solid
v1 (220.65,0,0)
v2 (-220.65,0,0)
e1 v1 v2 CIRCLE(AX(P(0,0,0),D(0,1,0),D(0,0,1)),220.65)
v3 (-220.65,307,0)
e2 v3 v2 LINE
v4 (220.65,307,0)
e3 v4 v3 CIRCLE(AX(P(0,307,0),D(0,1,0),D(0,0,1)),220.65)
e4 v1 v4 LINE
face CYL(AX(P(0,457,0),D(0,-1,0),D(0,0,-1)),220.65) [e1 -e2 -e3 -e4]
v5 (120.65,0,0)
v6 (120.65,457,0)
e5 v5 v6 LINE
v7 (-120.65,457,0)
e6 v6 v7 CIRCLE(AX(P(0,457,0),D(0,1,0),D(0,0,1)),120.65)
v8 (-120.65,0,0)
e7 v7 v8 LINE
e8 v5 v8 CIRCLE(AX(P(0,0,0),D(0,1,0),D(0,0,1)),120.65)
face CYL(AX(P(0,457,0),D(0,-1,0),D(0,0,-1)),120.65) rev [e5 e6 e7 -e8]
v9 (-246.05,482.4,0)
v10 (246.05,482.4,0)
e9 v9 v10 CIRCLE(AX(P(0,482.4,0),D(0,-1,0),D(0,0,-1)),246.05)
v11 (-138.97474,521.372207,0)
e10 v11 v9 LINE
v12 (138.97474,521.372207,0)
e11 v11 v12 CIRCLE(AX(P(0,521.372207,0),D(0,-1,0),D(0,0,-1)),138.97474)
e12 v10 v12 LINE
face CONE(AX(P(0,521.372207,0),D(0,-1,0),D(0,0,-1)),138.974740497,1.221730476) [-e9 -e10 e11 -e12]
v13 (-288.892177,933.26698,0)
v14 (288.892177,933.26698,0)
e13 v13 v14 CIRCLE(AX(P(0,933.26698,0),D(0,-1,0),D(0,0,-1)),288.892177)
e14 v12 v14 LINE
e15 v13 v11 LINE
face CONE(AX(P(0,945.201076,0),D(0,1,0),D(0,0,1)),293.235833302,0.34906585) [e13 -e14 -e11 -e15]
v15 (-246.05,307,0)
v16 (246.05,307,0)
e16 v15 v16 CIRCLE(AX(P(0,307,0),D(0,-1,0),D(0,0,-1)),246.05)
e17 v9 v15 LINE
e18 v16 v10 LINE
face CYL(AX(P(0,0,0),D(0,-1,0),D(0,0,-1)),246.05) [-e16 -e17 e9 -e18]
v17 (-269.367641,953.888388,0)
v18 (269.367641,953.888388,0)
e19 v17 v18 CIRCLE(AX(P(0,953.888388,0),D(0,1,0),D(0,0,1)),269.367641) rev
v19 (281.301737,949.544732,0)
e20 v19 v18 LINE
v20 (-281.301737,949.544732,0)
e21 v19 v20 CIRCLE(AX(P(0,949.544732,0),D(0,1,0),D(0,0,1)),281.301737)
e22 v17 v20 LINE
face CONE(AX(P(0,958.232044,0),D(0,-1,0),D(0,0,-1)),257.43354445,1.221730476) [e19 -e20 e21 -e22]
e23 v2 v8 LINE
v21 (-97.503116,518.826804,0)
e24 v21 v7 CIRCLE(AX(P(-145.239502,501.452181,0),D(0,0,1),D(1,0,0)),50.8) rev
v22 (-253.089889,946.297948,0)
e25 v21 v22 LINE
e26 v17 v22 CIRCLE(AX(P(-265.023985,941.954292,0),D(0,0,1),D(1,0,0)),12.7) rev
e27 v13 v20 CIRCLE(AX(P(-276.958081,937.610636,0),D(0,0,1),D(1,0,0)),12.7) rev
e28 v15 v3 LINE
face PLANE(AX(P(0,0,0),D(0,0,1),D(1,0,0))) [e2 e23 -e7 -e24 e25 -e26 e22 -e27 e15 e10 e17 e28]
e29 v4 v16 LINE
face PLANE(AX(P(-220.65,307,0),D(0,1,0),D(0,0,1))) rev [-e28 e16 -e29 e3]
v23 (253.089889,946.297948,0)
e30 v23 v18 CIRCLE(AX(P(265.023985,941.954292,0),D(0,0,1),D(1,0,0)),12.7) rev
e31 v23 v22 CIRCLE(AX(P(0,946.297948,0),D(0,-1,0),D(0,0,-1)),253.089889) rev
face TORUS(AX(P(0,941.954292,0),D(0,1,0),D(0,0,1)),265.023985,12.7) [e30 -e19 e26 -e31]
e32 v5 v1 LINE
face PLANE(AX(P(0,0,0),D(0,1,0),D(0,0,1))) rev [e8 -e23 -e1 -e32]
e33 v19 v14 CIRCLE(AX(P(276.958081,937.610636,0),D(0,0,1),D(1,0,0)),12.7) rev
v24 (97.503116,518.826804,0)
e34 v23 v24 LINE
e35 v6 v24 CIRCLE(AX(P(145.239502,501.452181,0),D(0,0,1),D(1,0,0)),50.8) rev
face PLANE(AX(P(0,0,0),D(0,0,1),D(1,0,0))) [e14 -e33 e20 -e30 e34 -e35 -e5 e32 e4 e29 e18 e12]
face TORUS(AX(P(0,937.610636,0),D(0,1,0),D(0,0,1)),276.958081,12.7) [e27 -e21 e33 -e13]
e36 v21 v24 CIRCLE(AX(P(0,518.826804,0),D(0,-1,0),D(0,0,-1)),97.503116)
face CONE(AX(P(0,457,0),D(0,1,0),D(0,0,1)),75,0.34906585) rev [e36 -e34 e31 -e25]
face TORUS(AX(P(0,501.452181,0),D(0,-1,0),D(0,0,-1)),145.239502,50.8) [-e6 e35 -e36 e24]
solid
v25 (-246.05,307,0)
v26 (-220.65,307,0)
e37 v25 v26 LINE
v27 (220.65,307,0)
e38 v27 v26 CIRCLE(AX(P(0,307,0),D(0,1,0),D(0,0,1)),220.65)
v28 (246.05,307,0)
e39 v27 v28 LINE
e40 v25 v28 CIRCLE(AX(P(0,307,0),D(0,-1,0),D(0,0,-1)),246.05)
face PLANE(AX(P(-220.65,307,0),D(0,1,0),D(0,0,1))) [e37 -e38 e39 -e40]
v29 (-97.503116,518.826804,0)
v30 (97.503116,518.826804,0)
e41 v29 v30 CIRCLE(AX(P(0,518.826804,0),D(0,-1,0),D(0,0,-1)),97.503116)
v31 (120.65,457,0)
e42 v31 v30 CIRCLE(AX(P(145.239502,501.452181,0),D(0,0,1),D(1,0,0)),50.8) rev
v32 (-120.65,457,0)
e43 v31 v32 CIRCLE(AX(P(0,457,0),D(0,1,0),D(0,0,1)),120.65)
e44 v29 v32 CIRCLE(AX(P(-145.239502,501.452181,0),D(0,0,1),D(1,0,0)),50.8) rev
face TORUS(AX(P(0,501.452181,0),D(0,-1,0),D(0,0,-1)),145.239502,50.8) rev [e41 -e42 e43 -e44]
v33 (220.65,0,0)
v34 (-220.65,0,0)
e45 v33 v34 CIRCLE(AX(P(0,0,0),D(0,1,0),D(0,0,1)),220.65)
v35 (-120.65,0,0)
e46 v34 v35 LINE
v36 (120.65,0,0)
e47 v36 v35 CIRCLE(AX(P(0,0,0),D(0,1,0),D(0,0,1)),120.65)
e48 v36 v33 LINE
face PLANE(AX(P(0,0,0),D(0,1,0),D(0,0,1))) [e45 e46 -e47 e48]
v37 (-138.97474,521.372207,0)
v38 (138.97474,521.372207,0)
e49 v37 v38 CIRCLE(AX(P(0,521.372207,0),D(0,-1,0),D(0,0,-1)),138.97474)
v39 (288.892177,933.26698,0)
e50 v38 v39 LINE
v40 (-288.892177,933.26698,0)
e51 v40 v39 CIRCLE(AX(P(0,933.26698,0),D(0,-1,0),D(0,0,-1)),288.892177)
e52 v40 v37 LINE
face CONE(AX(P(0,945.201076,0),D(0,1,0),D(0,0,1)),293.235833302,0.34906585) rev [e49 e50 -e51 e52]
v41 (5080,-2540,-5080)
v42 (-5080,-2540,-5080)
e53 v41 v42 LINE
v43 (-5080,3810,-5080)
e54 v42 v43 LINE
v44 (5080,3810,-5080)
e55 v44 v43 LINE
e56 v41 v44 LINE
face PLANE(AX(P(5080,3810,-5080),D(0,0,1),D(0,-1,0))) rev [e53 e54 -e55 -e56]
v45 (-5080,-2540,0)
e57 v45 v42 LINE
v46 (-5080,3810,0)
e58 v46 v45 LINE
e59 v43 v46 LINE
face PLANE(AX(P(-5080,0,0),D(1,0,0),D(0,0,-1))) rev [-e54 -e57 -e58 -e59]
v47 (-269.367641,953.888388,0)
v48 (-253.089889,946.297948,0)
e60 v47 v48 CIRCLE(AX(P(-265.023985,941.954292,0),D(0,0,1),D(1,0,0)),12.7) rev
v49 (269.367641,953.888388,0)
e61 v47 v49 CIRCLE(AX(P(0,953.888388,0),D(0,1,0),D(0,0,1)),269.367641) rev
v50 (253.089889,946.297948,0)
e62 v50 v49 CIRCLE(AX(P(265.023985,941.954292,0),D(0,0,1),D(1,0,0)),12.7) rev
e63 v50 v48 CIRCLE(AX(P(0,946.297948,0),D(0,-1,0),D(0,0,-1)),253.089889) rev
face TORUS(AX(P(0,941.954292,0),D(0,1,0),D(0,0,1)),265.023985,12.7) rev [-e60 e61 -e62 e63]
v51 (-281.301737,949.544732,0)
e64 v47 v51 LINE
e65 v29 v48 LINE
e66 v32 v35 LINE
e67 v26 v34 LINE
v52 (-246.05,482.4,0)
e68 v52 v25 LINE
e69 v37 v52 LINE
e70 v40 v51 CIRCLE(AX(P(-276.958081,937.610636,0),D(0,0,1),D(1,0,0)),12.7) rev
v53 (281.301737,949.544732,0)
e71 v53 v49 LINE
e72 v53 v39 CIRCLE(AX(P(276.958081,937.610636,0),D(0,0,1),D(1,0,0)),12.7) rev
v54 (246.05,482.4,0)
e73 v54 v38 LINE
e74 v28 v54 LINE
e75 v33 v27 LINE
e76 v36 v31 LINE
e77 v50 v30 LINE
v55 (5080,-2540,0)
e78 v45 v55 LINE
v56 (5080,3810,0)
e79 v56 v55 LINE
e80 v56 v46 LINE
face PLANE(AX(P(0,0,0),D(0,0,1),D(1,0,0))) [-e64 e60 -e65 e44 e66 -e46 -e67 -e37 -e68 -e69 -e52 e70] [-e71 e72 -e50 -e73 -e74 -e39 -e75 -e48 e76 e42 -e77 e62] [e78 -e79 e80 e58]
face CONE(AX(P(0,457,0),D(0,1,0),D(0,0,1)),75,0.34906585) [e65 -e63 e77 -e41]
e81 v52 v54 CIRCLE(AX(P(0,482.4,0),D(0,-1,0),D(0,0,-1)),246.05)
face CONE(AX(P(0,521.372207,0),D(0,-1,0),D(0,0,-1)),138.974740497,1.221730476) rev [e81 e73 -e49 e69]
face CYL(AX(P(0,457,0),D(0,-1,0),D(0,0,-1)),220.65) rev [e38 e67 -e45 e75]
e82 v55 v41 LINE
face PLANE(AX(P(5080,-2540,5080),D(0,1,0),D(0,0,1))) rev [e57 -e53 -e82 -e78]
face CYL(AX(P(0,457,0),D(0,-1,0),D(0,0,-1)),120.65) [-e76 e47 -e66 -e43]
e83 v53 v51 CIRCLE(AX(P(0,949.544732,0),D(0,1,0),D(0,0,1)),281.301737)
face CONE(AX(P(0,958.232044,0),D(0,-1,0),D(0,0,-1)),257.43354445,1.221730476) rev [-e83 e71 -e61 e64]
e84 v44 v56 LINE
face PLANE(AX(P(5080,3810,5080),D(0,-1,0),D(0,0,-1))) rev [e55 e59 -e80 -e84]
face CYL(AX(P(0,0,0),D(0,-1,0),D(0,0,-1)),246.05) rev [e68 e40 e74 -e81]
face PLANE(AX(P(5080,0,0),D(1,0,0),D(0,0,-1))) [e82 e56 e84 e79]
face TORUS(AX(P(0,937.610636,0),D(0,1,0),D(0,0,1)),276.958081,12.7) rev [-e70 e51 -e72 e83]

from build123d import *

# Parameters (mm, degrees)
SKETCH1_R           = 220.65
SKETCH1_R_2         = 120.65
BOSS_EXTRUDE1_DEPTH = 457
FILLET1_R           = 50.8
FILLET2_R           = 12.7
SKETCH3_W           = 10160
SKETCH3_H           = 6350
BOSS_EXTRUDE2_DEPTH = 5080
SKETCH4_W           = 13475.768327993
SKETCH4_H           = 8367.586519284
CUT_EXTRUDE1_DEPTH  = 8132.96778154


# Read off the part's stored shape, not the designer's step: Intersect1
with BuildPart() as part:
    # Sketch1 → Boss-Extrude1 (new body)
    with BuildSketch(Plane(origin=(0, 0, 0), x_dir=(1, 0, 0), z_dir=(0, 1, 0))):
        with Locations(Location((0, 0, 0), (0, 0, 270))):
            Circle(SKETCH1_R)
        with Locations(Location((0, 0, 0), (0, 0, 270))):
            Circle(SKETCH1_R_2, mode=Mode.SUBTRACT)
    extrude(amount=BOSS_EXTRUDE1_DEPTH)

    # Sketch2 → Revolve1 (revolve)
    with BuildSketch(Plane.XY, mode=Mode.PRIVATE) as revolve1_sk:
        Polygon((-220.65, 307), (-246.05, 307), (-246.05, 482.4), (-138.974740497, 521.372207285), (-293.235833302, 945.201076466), (-257.43354445, 958.232043927), (-101.061934921, 528.604577704), (-75, 457), (-220.65, 457), align=None)
    revolve(revolve1_sk.sketch.rotate(Axis((0, 0, 0), (0, 1, 0)), 270), axis=Axis((0, 0, 0), (0, 1, 0)))

    # Fillet1
    # the kernel refuses this fillet: 50.8 mm, written as the material it takes off along each edge
    with BuildSketch(Plane(origin=(0, 457, 0), x_dir=(0, 0, -1), z_dir=(1, 0, 0))) as fillet1_piece_1:
        with BuildLine():
            CenterArc((145.239501631, 44.452181156), FILLET1_R, 160, 81.050057514)
            Line((120.65, 0), (120.158209967, -0.889043623))
            ThreePointArc((120.158209967, -0.889043623), (97.825, -1.016), (75, -1.016))
            Line((75, -1.016), (74.045272297, 0.347492466))
            Line((74.045272297, 0.347492466), (96.548388792, 62.174296903))
            Line((96.548388792, 62.174296903), (97.503116495, 61.826804437))
        make_face()
    revolve(axis=Axis((0, 457, 0), (0, 1, 0)), mode=Mode.SUBTRACT)

    # Fillet2
    fillet2_edges = [part.edges().sort_by_distance(p)[0] for p in [
        (0, 945.201076466, 293.235833302),
        (0, 958.232043927, 257.43354445),
    ]]
    fillet(fillet2_edges, radius=FILLET2_R)


with BuildPart() as body_2:
    # Sketch3 → Boss-Extrude2 (new, symmetric)
    with BuildSketch(Plane(origin=(0, 0, 0), x_dir=(0, 0, -1), z_dir=(1, 0, 0))):
        with Locations((0, 635)):
            Rectangle(SKETCH3_W, SKETCH3_H)
    extrude(amount=BOSS_EXTRUDE2_DEPTH, both=True)

    # Intersect1 outline → Intersect1 (revolve, cut)
    with BuildSketch(Plane.XY):
        with BuildLine():
            Line((281.301737018, 949.544732287), (269.367640734, 953.888388107))
            ThreePointArc((269.367640734, 953.888388107), (259.65673299, 953.464400718), (253.08988863, 946.297947643))
            Line((253.08988863, 946.297947643), (97.503116495, 518.826804437))
            ThreePointArc((97.503116495, 518.826804437), (97.664330471, 483.640862027), (120.65, 457))
            Line((120.65, 457), (120.65, 0))
            Line((120.65, 0), (220.65, 0))
            Line((220.65, 0), (220.65, 307))
            Line((220.65, 307), (246.05, 307))
            Line((246.05, 307), (246.05, 482.4))
            Line((246.05, 482.4), (138.974740497, 521.372207285))
            Line((138.974740497, 521.372207285), (288.892177482, 933.266980183))
            ThreePointArc((288.892177482, 933.266980183), (288.468190093, 942.977887927), (281.301737018, 949.544732287))
        make_face()
    revolve(axis=Axis((0, 0, 0), (0, 1, 0)), mode=Mode.SUBTRACT)


with BuildPart() as cut_extrude1_tool:
    # Sketch4 → Cut-Extrude1 (new, through all)
    with BuildSketch(Plane.XY):
        with Locations((454.179344916, 464.014834855)):
            Rectangle(SKETCH4_W, SKETCH4_H)
    extrude(amount=CUT_EXTRUDE1_DEPTH)


with BuildPart() as part_1:
    add(part.part)

    # Cut-Extrude1: cut by cut_extrude1_tool
    add(cut_extrude1_tool.part, mode=Mode.SUBTRACT)


with BuildPart() as body_2_1:
    add(body_2.part)

    # Cut-Extrude1: cut by cut_extrude1_tool
    add(cut_extrude1_tool.part, mode=Mode.SUBTRACT)


solid = Compound([part_1.part, body_2_1.part])
